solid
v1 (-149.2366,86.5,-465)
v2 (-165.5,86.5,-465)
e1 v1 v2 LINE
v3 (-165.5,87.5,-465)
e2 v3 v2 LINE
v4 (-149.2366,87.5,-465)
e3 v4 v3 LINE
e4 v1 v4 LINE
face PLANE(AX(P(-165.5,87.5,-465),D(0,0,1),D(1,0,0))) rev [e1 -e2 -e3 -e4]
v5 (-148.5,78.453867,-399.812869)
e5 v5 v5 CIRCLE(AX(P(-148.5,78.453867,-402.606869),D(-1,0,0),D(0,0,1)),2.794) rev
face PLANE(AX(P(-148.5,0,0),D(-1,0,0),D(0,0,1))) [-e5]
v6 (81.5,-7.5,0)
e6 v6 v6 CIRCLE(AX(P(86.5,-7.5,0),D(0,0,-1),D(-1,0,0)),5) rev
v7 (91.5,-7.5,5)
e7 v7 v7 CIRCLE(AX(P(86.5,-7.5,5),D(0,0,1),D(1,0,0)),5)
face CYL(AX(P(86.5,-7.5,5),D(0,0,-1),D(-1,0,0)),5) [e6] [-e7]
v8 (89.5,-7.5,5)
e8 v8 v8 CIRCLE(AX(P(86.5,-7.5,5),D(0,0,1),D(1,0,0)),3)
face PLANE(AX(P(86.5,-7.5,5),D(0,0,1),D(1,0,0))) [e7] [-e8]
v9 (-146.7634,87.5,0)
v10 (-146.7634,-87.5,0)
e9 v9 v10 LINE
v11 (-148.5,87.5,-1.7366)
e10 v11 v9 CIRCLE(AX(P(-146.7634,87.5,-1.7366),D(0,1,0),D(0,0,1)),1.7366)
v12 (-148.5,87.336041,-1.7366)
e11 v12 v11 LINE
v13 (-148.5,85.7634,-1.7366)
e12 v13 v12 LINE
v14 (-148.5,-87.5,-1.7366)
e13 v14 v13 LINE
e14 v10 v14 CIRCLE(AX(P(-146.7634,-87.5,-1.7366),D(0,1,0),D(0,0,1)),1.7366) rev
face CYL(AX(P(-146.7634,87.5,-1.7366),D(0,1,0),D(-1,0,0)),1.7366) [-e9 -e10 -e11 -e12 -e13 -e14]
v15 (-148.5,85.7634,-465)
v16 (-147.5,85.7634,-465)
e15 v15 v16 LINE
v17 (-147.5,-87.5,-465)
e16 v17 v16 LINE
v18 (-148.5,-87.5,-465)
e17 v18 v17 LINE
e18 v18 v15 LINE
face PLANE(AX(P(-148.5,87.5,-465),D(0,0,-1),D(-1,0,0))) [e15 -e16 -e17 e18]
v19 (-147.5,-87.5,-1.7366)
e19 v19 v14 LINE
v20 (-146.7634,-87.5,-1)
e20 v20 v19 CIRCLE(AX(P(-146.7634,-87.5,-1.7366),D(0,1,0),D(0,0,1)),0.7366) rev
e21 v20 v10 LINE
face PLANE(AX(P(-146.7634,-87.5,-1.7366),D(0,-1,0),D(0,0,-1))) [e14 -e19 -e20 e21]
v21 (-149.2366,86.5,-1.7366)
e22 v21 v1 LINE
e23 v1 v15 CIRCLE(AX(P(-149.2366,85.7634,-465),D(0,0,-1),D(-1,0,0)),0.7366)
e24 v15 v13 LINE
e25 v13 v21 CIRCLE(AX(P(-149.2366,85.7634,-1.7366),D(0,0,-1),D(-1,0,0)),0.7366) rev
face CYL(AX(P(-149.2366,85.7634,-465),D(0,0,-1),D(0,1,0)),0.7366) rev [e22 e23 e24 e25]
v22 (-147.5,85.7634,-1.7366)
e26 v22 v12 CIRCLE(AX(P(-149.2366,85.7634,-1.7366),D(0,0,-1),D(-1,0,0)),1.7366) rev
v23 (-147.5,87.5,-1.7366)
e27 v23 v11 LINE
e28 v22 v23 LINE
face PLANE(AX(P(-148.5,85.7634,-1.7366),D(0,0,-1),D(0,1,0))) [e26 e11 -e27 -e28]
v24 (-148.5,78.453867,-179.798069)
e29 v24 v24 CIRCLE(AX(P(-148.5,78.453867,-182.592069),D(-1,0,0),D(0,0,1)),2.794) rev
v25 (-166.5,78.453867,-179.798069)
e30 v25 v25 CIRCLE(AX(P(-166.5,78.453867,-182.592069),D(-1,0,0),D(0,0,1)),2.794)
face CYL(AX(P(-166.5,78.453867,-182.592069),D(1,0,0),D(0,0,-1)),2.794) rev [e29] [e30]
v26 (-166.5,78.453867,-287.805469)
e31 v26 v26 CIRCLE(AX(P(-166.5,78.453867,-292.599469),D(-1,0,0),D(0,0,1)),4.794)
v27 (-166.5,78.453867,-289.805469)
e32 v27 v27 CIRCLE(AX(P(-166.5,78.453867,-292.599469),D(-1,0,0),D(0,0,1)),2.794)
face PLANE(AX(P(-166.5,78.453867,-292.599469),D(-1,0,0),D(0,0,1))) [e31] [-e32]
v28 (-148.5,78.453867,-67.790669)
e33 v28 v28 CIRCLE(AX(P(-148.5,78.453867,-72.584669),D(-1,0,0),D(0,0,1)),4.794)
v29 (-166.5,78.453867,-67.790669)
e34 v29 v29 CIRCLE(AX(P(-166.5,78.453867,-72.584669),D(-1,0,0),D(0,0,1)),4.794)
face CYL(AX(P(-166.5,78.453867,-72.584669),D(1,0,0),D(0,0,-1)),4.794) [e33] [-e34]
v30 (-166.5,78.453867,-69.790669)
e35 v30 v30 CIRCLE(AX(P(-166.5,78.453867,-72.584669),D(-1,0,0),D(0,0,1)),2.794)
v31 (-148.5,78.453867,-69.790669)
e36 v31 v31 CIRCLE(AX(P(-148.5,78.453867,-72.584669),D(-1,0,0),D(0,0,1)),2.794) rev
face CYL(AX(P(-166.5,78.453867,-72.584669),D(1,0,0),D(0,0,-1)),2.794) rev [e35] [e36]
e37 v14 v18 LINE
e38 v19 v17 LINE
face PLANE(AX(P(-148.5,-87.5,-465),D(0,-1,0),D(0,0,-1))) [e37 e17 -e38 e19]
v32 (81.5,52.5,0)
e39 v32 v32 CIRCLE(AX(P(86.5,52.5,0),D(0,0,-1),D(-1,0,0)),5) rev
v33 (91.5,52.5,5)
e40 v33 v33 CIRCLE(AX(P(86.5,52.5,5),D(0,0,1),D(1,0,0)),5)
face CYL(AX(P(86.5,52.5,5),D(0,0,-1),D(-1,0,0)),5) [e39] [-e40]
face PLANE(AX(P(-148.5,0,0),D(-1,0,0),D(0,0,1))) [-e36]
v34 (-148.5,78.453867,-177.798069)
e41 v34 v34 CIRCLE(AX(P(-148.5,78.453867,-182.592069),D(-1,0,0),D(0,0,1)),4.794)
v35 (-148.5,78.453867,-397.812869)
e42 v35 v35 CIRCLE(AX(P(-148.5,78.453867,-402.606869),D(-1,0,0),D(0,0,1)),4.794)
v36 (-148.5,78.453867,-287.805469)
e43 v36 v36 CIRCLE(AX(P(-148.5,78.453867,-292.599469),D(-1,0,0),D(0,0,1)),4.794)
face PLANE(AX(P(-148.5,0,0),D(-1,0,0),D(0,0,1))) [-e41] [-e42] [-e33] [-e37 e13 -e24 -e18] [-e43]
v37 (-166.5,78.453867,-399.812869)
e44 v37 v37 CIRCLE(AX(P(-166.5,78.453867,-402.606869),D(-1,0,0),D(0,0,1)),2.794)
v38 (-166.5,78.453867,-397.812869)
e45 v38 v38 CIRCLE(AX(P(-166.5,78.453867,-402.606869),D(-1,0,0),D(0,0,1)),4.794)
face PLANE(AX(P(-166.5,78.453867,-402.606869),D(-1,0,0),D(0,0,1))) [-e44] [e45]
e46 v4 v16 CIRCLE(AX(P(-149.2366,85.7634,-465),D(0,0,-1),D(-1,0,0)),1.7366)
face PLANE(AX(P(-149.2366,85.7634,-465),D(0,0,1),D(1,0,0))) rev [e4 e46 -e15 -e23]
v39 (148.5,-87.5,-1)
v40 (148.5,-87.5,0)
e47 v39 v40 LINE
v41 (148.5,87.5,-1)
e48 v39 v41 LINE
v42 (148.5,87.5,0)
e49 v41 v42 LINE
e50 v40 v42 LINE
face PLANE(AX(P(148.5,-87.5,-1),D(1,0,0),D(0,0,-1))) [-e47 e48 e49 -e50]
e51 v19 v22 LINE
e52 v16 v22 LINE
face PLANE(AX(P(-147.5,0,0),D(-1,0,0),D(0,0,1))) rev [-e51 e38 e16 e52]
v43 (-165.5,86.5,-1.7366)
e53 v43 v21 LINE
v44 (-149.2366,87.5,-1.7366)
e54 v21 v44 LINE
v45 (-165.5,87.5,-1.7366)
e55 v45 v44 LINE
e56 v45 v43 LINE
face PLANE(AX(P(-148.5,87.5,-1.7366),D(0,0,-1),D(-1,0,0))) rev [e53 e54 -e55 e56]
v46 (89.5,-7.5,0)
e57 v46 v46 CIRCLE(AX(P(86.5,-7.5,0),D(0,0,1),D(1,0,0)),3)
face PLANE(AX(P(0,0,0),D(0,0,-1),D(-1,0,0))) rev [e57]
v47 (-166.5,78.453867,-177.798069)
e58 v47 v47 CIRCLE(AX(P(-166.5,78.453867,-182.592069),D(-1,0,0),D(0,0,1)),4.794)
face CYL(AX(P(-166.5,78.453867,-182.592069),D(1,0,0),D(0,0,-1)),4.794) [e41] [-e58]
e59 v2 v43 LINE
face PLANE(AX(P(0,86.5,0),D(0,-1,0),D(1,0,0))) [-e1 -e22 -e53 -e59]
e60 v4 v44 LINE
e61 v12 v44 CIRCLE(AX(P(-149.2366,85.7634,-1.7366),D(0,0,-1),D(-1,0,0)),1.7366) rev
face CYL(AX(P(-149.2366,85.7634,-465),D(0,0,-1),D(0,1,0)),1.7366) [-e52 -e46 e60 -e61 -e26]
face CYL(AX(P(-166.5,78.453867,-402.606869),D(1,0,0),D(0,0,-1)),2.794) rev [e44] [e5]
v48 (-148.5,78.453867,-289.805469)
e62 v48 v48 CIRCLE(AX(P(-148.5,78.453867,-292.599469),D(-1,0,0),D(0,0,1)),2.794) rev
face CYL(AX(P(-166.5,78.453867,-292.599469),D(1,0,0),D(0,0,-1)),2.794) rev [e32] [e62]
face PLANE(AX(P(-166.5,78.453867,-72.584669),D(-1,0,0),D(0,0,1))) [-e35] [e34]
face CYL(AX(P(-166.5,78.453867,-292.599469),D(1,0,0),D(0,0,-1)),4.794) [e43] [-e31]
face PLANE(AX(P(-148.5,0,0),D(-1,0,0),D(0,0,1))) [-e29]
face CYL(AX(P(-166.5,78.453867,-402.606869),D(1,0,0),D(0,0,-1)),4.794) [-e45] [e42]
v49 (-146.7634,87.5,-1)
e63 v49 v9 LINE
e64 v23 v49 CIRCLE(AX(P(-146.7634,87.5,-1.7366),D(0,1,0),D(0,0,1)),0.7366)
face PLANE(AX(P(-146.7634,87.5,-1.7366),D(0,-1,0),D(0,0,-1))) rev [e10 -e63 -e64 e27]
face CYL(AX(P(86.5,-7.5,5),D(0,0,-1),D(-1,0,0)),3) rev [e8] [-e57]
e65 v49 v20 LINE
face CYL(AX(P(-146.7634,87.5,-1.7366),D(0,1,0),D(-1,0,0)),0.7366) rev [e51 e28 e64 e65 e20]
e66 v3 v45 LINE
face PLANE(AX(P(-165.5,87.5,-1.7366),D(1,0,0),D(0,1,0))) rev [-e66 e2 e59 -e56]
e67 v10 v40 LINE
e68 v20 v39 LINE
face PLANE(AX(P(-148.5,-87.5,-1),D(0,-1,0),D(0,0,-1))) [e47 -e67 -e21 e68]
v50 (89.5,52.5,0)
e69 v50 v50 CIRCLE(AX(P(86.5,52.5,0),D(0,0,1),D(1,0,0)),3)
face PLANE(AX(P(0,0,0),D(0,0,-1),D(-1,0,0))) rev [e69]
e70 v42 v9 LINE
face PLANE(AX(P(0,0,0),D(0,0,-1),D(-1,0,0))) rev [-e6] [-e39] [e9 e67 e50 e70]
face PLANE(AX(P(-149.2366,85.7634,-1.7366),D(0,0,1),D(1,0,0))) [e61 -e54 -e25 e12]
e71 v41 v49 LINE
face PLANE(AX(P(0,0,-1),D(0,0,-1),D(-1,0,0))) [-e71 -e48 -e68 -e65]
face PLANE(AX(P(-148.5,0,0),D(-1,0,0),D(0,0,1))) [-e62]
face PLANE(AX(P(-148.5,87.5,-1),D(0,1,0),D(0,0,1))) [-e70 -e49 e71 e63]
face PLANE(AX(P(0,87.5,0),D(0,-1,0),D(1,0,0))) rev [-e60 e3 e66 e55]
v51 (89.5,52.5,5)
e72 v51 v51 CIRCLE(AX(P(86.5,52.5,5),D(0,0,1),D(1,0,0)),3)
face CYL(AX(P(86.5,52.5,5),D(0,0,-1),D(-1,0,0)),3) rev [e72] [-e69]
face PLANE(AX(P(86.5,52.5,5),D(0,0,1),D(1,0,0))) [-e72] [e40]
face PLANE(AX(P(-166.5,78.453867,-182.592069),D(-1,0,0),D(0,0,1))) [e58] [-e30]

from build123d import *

# Parameters (mm, degrees)
SKETCH1_W                    = 297
SKETCH1_H                    = 175
BASE_FLANGE1_DEPTH           = 1
EDGE_FLANGE1_STRIP_W         = 5.4732
EDGE_FLANGE1_STRIP_H         = 1
EDGE_FLANGE1_STRIP_CUT_DEPTH = 175
EDGE_FLANGE1_DEPTH           = 175
EDGE_FLANGE2_STRIP_W         = 5.4732
EDGE_FLANGE2_STRIP_H         = 1
EDGE_FLANGE2_STRIP_CUT_DEPTH = 463.2634
EDGE_FLANGE2_DEPTH           = 463.2634
SKETCH17_R                   = 4.794
SKETCH17_R_2                 = 2.794
BOSS_EXTRUDE1_DEPTH          = 18
SKETCH21_R                   = 5
SKETCH21_R_2                 = 3
BOSS_EXTRUDE2_DEPTH          = 5


# Sheet-metal steps are written as plain solids
with BuildPart() as part:
    # Sketch1 → Base-Flange1 (new body)
    with BuildSketch(Plane.XY):
        Rectangle(SKETCH1_W, SKETCH1_H)
    extrude(amount=-BASE_FLANGE1_DEPTH)

    # Edge-Flange1 strip (across the edge) → Edge-Flange1 strip cut (cut)
    with BuildSketch(Plane(origin=(-148.5, -87.5, -1), x_dir=(1, 0, 0), z_dir=(0, 1, 0))):
        with Locations((-1, -0.5)):
            Rectangle(EDGE_FLANGE1_STRIP_W, EDGE_FLANGE1_STRIP_H)
    extrude(amount=EDGE_FLANGE1_STRIP_CUT_DEPTH, mode=Mode.SUBTRACT)

    # Edge-Flange1 section (across the edge) → Edge-Flange1 (add)
    with BuildSketch(Plane(origin=(-148.5, -87.5, -1), x_dir=(1, 0, 0), z_dir=(0, 1, 0))):
        with BuildLine():
            Line((0, 0.7366), (0, 464))
            Line((0, 464), (1, 464))
            Line((1, 464), (1, 0.7366))
            ThreePointArc((1, 0.7366), (1.215745145, 0.215745145), (1.7366, 0))
            Line((1.7366, 0), (1.7366, -1))
            ThreePointArc((1.7366, -1), (0.508638364, -0.491361636), (0, 0.7366))
        make_face()
    extrude(amount=EDGE_FLANGE1_DEPTH)

    # Edge-Flange2 strip (across the edge) → Edge-Flange2 strip cut (cut)
    with BuildSketch(Plane(origin=(-148.5, 87.5, -1.7366), x_dir=(0, -1, 0), z_dir=(0, 0, -1))):
        with Locations((-1, -0.5)):
            Rectangle(EDGE_FLANGE2_STRIP_W, EDGE_FLANGE2_STRIP_H)
    extrude(amount=EDGE_FLANGE2_STRIP_CUT_DEPTH, mode=Mode.SUBTRACT)

    # Edge-Flange2 section (across the edge) → Edge-Flange2 (add)
    with BuildSketch(Plane(origin=(-148.5, 87.5, -1.7366), x_dir=(0, -1, 0), z_dir=(0, 0, -1))):
        with BuildLine():
            Line((0, 0.7366), (0, 17))
            Line((0, 17), (1, 17))
            Line((1, 17), (1, 0.7366))
            ThreePointArc((1, 0.7366), (1.215745145, 0.215745145), (1.7366, 0))
            Line((1.7366, 0), (1.7366, -1))
            ThreePointArc((1.7366, -1), (0.508638364, -0.491361636), (0, 0.7366))
        make_face()
    extrude(amount=EDGE_FLANGE2_DEPTH)

    # Sketch17 → Boss-Extrude1 (add)
    # profile 1 of 4: a face of its own
    with BuildSketch(Plane.ZY.offset(148.5)):
        with Locations((-72.584668807, 78.453866984)):
            Circle(SKETCH17_R)
        with Locations((-72.584668807, 78.453866984)):
            Circle(SKETCH17_R_2, mode=Mode.SUBTRACT)
    # profile 2 of 4: a face of its own
    with BuildSketch(Plane.ZY.offset(148.5)):
        with Locations((-182.592068807, 78.453866984)):
            Circle(SKETCH17_R)
        with Locations((-182.592068807, 78.453866984)):
            Circle(SKETCH17_R_2, mode=Mode.SUBTRACT)
    # profile 3 of 4: a face of its own
    with BuildSketch(Plane.ZY.offset(148.5)):
        with Locations((-292.599468807, 78.453866984)):
            Circle(SKETCH17_R)
        with Locations((-292.599468807, 78.453866984)):
            Circle(SKETCH17_R_2, mode=Mode.SUBTRACT)
    # profile 4 of 4: a face of its own
    with BuildSketch(Plane.ZY.offset(148.5)):
        with Locations((-402.606868807, 78.453866984)):
            Circle(SKETCH17_R)
        with Locations((-402.606868807, 78.453866984)):
            Circle(SKETCH17_R_2, mode=Mode.SUBTRACT)
    extrude(amount=BOSS_EXTRUDE1_DEPTH)

    # Sketch21 → Boss-Extrude2 (add)
    # profile 1 of 2: a face of its own
    with BuildSketch(Plane.XY):
        with Locations(Location((86.5, 52.5, 0), (0, 0, 180))):
            Circle(SKETCH21_R)
        with Locations((86.5, 52.5)):
            Circle(SKETCH21_R_2, mode=Mode.SUBTRACT)
    # profile 2 of 2: a face of its own
    with BuildSketch(Plane.XY):
        with Locations(Location((86.5, -7.5, 0), (0, 0, 180))):
            Circle(SKETCH21_R)
        with Locations((86.5, -7.5)):
            Circle(SKETCH21_R_2, mode=Mode.SUBTRACT)
    extrude(amount=BOSS_EXTRUDE2_DEPTH)


solid = part.part
